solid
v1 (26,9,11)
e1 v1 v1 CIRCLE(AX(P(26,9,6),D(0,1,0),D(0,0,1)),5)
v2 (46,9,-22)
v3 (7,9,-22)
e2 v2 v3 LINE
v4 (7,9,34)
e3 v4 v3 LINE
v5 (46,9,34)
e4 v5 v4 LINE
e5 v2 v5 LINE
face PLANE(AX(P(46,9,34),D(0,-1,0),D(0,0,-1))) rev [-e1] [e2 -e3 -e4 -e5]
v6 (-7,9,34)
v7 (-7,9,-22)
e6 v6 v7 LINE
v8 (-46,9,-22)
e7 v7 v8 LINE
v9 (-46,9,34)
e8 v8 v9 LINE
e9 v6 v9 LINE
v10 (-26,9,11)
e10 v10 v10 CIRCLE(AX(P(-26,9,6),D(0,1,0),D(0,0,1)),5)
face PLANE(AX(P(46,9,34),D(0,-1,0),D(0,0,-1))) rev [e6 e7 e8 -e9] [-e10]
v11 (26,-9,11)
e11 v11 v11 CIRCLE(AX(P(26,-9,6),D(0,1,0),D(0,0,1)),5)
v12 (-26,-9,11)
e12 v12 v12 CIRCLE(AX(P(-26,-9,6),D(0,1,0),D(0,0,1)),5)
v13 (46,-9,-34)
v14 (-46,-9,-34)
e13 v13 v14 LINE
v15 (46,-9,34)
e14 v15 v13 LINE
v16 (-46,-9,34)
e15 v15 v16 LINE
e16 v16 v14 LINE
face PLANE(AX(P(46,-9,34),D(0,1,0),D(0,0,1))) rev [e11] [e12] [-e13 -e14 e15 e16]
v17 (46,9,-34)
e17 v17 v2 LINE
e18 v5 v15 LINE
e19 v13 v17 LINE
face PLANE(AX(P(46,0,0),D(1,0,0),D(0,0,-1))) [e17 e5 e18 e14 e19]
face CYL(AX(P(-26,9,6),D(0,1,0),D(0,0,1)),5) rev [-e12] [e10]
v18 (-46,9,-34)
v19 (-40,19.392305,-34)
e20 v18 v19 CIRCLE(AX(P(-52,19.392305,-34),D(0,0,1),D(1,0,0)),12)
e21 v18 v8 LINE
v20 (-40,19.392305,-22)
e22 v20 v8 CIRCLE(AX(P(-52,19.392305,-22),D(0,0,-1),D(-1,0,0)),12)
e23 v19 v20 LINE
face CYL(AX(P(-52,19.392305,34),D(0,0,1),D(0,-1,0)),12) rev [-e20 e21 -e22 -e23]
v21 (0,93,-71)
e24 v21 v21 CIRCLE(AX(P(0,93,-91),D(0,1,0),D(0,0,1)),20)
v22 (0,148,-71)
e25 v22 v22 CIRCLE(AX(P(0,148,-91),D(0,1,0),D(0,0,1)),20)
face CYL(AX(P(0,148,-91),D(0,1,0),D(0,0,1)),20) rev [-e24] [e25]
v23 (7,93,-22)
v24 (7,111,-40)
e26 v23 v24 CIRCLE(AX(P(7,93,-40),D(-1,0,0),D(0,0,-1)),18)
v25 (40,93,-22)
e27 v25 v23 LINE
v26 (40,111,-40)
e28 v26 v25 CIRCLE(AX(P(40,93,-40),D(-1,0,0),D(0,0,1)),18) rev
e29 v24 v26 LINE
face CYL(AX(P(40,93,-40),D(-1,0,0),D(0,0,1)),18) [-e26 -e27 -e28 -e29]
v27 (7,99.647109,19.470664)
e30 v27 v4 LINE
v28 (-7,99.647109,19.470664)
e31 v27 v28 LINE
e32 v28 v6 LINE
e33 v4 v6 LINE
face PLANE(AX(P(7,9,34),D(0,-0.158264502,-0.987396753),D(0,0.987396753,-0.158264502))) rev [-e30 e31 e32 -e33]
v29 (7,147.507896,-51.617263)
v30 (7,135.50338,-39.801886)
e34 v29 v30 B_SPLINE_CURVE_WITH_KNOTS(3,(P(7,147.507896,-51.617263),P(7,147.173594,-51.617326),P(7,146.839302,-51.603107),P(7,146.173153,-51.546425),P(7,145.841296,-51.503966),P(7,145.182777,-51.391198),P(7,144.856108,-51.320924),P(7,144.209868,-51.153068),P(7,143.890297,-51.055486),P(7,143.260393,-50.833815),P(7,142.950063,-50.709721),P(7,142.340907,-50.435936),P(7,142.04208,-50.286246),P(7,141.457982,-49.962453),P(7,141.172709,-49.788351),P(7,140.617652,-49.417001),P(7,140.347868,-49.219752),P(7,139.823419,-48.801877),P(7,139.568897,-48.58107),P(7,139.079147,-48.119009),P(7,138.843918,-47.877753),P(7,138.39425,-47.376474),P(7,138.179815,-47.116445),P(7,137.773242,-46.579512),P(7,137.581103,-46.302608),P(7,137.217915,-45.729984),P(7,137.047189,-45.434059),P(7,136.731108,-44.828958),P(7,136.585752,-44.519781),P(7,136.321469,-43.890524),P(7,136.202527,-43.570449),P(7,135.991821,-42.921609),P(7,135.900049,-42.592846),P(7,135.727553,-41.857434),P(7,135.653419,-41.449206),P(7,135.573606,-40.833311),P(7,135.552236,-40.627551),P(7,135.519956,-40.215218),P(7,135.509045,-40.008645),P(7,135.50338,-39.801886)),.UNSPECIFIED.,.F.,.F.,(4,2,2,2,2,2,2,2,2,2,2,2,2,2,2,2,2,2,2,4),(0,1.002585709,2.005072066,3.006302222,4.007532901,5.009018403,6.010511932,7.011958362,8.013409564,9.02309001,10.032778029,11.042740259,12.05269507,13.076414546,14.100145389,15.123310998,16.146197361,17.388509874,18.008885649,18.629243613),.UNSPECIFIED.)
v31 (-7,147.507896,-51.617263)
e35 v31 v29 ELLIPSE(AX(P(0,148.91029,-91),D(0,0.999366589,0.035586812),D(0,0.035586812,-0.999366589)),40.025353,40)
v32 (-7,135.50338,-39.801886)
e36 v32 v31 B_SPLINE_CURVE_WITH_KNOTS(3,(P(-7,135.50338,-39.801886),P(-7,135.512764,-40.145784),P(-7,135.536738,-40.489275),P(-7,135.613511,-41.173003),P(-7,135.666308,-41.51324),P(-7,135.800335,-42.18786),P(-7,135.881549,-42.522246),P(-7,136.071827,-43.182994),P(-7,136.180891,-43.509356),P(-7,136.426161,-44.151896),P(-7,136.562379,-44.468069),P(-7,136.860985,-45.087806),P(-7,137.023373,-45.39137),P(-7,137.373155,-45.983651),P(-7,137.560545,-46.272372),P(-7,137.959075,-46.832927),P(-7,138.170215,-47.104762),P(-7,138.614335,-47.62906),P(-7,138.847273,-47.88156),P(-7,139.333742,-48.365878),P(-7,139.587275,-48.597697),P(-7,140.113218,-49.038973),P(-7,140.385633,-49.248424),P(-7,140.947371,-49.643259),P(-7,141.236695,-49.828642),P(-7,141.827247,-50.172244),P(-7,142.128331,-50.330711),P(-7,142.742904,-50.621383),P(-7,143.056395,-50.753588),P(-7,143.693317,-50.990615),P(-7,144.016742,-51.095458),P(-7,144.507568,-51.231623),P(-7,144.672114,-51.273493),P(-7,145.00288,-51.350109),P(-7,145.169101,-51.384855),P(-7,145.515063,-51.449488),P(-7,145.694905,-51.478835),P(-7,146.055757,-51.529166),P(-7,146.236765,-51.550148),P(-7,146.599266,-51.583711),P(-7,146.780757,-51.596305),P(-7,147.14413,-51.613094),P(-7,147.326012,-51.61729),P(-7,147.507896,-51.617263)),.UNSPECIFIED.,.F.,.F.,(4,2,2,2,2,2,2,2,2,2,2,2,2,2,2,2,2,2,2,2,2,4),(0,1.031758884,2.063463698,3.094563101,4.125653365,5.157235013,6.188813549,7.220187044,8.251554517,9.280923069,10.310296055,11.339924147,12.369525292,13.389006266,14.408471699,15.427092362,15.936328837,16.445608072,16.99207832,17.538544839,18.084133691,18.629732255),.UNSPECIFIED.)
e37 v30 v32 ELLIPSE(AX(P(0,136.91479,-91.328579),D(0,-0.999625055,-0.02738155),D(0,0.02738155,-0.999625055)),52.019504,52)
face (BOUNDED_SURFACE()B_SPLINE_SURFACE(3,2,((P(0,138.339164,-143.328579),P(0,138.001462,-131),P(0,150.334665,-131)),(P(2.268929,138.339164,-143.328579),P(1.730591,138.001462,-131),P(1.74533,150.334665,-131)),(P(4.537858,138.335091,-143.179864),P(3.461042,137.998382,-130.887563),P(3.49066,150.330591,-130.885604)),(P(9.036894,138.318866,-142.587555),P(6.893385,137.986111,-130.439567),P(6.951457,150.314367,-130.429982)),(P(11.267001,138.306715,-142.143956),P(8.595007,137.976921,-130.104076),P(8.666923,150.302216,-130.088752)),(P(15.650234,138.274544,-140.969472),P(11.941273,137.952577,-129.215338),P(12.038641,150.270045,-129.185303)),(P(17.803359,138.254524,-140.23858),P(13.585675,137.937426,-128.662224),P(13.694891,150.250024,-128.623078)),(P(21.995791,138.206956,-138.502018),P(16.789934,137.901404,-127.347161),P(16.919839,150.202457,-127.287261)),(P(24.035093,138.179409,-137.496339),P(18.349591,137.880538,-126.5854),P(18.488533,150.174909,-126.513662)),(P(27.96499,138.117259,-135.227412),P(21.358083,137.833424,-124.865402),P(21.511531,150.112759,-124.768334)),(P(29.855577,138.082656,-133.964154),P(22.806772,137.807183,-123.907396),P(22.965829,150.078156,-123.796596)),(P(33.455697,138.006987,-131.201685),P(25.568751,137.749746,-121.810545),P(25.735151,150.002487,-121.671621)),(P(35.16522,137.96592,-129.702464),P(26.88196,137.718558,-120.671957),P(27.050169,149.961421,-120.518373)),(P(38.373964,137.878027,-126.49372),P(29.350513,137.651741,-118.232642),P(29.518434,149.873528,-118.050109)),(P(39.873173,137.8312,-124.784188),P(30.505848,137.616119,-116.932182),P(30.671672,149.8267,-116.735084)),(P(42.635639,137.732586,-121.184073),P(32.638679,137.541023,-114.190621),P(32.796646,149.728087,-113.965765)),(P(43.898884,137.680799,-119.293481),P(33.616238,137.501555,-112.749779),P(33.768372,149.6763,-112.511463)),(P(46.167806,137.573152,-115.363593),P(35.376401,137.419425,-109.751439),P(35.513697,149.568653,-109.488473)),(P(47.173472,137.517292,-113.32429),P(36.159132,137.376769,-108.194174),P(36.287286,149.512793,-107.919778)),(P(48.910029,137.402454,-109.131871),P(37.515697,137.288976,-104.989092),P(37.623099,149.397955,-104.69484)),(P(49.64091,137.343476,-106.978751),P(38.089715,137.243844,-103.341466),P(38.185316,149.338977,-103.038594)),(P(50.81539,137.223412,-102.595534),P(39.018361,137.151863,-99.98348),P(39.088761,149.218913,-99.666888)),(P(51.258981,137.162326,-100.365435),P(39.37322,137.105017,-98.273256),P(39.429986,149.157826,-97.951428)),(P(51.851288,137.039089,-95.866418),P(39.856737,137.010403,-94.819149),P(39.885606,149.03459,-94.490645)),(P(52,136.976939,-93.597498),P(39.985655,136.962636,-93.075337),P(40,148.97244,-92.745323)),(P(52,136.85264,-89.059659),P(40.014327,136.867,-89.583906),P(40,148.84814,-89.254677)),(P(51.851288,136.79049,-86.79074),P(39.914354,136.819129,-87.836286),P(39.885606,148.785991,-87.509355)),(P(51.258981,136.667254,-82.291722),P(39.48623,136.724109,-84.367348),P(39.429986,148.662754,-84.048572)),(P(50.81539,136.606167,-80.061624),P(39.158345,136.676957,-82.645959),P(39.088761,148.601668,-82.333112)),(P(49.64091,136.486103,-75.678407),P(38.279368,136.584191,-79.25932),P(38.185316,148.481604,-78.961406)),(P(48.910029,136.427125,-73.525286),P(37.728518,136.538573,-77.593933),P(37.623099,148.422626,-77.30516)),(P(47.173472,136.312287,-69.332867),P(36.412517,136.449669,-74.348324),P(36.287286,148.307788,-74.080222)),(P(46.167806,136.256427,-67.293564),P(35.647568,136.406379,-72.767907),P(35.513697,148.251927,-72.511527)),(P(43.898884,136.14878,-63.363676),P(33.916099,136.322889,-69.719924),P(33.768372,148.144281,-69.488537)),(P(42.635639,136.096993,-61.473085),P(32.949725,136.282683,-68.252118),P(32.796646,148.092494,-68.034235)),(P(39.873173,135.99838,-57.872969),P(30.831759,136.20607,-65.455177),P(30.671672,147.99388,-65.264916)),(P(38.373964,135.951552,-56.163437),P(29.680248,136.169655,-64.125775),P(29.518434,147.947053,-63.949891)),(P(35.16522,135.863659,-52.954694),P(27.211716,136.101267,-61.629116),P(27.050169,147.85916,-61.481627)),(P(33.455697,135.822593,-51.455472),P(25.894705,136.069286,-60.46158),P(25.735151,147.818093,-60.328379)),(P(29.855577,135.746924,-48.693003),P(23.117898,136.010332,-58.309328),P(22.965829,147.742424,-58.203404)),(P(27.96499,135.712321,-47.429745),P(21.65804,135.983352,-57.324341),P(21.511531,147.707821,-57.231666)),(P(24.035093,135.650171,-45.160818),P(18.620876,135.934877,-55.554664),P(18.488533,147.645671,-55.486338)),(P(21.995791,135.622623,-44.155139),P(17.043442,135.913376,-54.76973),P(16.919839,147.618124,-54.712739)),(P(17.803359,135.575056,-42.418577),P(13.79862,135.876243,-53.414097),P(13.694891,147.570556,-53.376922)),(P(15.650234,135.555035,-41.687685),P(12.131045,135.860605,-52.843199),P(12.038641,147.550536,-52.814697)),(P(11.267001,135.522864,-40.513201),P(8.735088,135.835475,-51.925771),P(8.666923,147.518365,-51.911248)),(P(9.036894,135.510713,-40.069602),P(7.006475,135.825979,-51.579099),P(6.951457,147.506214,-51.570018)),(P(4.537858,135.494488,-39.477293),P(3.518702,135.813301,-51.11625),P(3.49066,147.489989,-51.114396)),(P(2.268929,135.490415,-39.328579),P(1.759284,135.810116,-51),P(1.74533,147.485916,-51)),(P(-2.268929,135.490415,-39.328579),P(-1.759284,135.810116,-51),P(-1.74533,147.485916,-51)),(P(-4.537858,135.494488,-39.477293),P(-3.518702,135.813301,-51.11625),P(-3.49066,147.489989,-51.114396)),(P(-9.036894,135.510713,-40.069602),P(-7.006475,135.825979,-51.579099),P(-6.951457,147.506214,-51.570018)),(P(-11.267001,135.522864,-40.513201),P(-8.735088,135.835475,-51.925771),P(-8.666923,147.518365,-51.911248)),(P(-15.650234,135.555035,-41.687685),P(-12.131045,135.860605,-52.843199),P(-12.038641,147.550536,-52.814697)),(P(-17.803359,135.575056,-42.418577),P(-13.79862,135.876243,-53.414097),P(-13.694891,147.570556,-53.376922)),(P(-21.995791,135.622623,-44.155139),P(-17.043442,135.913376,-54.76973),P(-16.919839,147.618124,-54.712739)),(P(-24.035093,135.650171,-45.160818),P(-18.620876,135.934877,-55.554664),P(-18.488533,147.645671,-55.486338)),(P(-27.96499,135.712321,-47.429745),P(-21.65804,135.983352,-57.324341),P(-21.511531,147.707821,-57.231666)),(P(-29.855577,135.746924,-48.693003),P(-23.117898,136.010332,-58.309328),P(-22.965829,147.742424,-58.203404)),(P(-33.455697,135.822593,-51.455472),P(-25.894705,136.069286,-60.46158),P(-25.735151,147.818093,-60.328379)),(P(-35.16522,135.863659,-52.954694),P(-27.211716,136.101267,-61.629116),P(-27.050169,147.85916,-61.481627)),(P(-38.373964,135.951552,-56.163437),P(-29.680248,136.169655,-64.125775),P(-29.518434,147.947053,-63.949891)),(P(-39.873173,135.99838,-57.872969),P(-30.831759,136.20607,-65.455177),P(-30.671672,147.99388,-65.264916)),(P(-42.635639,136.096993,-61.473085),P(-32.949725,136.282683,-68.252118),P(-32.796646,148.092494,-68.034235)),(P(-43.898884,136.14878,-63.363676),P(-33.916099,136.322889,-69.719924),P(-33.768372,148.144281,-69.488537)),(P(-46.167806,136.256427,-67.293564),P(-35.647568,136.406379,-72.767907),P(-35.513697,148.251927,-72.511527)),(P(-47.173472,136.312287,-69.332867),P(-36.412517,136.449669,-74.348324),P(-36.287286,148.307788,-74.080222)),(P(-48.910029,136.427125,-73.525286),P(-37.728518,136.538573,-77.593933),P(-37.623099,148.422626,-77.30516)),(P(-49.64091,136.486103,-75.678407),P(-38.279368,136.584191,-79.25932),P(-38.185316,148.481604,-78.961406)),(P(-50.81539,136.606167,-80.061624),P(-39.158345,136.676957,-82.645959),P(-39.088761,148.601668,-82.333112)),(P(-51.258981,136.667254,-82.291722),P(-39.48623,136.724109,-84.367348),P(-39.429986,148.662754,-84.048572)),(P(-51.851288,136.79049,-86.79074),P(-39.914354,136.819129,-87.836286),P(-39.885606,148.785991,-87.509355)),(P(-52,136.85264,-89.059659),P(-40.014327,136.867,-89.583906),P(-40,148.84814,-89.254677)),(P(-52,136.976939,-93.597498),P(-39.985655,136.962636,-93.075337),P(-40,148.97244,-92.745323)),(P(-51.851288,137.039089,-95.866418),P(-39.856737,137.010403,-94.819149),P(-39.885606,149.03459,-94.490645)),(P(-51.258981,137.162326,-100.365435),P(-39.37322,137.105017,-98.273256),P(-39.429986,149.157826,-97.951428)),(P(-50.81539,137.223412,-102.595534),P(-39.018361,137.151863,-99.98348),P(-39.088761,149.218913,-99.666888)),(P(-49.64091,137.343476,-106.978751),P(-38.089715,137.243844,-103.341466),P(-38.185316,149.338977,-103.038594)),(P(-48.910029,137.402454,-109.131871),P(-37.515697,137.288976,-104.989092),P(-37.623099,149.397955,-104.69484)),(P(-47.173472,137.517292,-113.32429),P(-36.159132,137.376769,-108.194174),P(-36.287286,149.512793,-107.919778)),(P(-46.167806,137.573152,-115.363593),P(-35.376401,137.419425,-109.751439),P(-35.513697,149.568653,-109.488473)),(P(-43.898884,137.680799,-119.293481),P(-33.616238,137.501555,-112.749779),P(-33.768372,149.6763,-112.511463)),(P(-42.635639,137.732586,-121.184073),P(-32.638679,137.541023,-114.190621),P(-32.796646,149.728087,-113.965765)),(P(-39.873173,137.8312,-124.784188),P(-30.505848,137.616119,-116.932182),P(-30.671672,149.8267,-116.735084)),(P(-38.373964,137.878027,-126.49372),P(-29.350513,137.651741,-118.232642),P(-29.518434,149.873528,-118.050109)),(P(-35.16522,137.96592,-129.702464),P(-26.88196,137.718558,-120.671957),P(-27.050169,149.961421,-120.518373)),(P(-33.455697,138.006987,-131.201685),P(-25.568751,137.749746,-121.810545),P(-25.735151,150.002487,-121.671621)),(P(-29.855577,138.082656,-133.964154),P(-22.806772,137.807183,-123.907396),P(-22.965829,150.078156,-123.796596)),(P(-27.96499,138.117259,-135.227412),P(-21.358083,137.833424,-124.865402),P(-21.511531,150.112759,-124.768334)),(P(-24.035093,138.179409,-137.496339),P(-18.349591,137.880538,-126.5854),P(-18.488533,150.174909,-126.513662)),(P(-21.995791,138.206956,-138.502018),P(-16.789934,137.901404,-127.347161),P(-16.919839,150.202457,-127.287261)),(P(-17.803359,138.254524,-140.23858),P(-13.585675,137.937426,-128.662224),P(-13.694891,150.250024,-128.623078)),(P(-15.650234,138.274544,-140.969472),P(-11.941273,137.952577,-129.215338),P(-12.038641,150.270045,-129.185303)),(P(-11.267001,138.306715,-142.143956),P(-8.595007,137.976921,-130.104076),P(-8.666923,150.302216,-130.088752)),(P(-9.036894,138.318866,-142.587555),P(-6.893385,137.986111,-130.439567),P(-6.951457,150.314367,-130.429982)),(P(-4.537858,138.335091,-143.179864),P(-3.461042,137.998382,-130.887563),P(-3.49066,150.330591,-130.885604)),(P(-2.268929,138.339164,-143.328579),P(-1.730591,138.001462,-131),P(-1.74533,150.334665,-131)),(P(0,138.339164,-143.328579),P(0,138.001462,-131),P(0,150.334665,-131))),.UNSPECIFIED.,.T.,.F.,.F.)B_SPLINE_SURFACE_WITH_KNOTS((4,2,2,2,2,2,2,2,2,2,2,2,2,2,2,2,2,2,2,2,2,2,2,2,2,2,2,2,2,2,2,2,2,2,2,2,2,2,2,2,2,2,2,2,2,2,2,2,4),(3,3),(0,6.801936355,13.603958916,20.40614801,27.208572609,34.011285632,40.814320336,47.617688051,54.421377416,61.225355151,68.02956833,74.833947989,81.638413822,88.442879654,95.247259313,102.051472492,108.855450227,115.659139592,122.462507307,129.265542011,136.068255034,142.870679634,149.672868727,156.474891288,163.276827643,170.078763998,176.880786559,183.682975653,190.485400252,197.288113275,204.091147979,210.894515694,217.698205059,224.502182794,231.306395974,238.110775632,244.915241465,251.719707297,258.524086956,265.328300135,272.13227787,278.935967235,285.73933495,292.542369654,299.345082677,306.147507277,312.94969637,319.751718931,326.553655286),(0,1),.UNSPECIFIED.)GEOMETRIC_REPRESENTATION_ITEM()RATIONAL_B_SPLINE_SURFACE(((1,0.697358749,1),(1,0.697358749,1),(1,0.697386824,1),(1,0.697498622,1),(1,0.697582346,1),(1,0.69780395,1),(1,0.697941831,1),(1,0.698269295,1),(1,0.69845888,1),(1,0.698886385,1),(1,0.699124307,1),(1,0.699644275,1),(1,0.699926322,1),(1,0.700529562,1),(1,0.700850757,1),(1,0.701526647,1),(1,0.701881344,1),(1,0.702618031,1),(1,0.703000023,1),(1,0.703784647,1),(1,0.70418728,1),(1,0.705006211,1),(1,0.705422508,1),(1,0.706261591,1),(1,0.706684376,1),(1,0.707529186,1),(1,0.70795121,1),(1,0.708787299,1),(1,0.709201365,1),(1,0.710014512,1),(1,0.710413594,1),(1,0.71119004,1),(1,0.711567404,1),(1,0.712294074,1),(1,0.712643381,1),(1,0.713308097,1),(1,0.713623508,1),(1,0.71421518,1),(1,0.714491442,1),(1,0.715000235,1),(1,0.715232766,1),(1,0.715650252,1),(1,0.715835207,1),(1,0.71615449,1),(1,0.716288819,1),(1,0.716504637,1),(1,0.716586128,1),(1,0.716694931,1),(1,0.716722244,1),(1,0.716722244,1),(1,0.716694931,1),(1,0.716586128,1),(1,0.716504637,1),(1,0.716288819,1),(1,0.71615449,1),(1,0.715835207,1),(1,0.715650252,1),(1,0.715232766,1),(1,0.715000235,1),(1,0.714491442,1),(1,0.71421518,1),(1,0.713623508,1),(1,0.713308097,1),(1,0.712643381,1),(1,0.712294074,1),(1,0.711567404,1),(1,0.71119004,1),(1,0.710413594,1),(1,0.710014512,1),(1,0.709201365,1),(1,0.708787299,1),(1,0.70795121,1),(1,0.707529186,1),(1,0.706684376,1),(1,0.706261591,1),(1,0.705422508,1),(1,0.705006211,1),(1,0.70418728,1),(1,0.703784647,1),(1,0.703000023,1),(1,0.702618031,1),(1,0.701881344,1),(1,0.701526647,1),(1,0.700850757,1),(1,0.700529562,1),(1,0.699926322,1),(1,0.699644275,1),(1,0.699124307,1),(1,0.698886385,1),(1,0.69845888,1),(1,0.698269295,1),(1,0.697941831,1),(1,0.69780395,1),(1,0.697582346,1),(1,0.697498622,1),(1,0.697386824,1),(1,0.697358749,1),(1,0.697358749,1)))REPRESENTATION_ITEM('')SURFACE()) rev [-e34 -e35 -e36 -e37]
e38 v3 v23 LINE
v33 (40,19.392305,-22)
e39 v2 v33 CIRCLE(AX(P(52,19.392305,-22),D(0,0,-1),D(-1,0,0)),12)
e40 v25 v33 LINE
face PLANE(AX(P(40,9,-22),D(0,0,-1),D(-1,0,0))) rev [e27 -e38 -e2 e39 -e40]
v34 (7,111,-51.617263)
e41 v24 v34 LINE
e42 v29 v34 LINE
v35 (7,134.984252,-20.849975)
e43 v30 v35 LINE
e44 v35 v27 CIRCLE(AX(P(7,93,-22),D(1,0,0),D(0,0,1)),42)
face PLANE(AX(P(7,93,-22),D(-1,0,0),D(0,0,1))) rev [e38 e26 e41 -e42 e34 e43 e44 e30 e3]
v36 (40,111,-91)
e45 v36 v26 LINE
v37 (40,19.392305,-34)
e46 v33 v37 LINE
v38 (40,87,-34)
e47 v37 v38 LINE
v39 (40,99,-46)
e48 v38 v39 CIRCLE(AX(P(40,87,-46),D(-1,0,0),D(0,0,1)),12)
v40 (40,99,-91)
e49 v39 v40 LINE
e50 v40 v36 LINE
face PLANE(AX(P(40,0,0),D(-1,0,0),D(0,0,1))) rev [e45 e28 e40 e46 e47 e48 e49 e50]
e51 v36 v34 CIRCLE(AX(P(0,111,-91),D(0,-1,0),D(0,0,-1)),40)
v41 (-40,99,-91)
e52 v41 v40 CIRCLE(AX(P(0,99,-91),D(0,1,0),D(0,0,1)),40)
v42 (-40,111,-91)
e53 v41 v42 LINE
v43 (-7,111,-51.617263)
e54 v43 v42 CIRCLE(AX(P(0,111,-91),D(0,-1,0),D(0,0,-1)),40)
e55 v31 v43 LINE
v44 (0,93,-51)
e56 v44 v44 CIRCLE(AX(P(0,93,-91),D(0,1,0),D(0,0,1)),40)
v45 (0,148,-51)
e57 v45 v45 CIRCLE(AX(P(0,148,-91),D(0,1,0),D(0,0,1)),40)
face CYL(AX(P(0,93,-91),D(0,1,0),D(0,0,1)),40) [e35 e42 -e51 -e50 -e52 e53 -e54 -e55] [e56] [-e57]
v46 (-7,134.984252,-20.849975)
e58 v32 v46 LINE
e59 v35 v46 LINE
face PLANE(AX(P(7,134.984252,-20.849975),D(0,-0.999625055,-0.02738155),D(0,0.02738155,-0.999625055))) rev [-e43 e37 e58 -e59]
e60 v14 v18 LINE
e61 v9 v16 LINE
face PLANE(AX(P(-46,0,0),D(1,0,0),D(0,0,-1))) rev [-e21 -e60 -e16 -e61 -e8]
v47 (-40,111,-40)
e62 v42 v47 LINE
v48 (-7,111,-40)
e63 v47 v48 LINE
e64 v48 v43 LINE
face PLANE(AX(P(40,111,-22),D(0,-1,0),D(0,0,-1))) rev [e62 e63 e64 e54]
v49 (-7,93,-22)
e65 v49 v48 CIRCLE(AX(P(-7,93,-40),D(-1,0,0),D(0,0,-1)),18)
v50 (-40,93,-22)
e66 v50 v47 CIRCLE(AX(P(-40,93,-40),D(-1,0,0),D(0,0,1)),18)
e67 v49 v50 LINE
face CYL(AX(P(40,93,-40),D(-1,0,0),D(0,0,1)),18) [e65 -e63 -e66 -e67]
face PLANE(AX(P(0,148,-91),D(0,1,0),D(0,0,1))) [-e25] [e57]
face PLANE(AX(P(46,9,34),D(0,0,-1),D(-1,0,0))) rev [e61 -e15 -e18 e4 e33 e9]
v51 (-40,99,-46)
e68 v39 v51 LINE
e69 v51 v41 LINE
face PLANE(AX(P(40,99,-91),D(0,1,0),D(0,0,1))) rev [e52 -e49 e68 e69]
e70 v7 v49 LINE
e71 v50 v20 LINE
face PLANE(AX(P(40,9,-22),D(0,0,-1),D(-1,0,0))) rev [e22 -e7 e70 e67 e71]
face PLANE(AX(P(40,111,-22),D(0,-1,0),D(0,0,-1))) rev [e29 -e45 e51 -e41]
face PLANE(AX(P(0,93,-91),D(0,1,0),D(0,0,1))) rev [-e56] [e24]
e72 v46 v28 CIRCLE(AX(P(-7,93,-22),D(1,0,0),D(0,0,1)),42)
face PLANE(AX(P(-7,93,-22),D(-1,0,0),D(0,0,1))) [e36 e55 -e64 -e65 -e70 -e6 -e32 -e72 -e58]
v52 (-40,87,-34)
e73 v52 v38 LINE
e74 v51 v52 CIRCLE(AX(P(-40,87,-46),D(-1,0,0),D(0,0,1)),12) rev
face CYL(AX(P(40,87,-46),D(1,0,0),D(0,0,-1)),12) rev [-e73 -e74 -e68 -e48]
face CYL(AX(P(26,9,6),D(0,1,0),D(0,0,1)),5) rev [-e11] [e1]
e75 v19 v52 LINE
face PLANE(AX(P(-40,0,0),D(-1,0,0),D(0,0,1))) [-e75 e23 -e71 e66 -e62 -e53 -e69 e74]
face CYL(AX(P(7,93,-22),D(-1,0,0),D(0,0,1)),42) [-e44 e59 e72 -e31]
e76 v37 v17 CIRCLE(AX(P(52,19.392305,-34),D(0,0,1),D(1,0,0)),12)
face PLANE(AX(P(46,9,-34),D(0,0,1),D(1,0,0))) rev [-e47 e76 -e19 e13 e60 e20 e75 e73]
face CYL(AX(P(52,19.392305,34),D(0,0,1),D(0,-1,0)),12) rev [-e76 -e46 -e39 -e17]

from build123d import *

# Parameters (mm, degrees)
SKETCH1_W                = 68
SKETCH1_H                = 18
BOSS_EXTRUDE1_DEPTH      = 46
BOSS_EXTRUDE2_DEPTH      = 40
FILLET1_R                = 12
FILLET3_R                = 18
FILLET4_R                = 12
BOSS_EXTRUDE3_DEPTH      = 37
BOSS_EXTRUDE3_DEPTH_BACK = 18
SKETCH3_R                = 40
HOLE1_D                  = 40
BOSS_EXTRUDE5_DEPTH      = 7
FILLET5_R                = 12
HOLE2_D                  = 10


with BuildPart() as part:
    # Sketch1 → Boss-Extrude1 (new, symmetric)
    with BuildSketch(Plane(origin=(0, 0, 0), x_dir=(0, 0, -1), z_dir=(1, 0, 0))):
        Rectangle(SKETCH1_W, SKETCH1_H)
    extrude(amount=BOSS_EXTRUDE1_DEPTH, both=True)

    # Sketch2 → Boss-Extrude2 (add, symmetric)
    with BuildSketch(Plane(origin=(0, 0, 0), x_dir=(0, 0, -1), z_dir=(1, 0, 0))):
        Polygon((34, 9), (22, 9), (22, 111), (91, 111), (91, 99), (34, 99), align=None)
    extrude(amount=BOSS_EXTRUDE2_DEPTH, both=True)

    # Fillet1
    # the kernel refuses this fillet: 12 mm, written as the material it adds along each edge
    with BuildSketch(Plane(origin=(-40, 9, -34), x_dir=(-1, 0, 0), z_dir=(0, 0, 1))) as fillet1_piece_1:
        with BuildLine():
            CenterArc((12, -10.392304845), FILLET1_R, 120, 60)
            Line((0, -10.392304845), (-0.24, -10.392304845))
            Line((-0.24, -10.392304845), (-0.24, 0))
            Line((-0.24, 0), (0, 0.24))
            ThreePointArc((0, 0.24), (3, 0.24), (5.88, 0.207846097))
            Line((5.88, 0.207846097), (6, 0))
        make_face()
    extrude(amount=12)
    with BuildSketch(Plane(origin=(40, 9, -34), x_dir=(1, 0, 0), z_dir=(0, 0, 1))) as fillet1_piece_2:
        with BuildLine():
            CenterArc((12, 10.392304845), FILLET1_R, 180, 60)
            Line((0, 10.392304845), (-0.24, 10.392304845))
            Line((-0.24, 10.392304845), (-0.24, 0))
            Line((-0.24, 0), (0, -0.24))
            ThreePointArc((0, -0.24), (3, -0.24), (5.88, -0.207846097))
            Line((5.88, -0.207846097), (6, 0))
        make_face()
    extrude(amount=12)

    # Fillet3
    fillet3_edges = [part.edges().sort_by_distance(p)[0] for p in [
        (0, 111, -22),
    ]]
    fillet(fillet3_edges, radius=FILLET3_R)

    # Fillet4
    fillet4_edges = [part.edges().sort_by_distance(p)[0] for p in [
        (0, 99, -34),
    ]]
    fillet(fillet4_edges, radius=FILLET4_R)

    # Sketch3 → Boss-Extrude3 (add, two sides: drawn at the far end of the back side and taken through both)
    with BuildSketch(Plane(origin=(0, 111, 0), x_dir=(1, 0, 0), z_dir=(0, 1, 0)).offset(-BOSS_EXTRUDE3_DEPTH_BACK)):
        with Locations(Location((0, 91, 0), (0, 0, 270))):
            Circle(SKETCH3_R)
    extrude(amount=BOSS_EXTRUDE3_DEPTH + BOSS_EXTRUDE3_DEPTH_BACK)

    # Hole1 (through all)
    with Locations(Plane(origin=(0, 148, 0), x_dir=(1, 0, 0), z_dir=(0, 1, 0))):
        with Locations((0, 91)):
            Hole(HOLE1_D / 2)

    # Sketch6 → Boss-Extrude5 (add, symmetric)
    with BuildSketch(Plane(origin=(0, 0, 0), x_dir=(0, 0, -1), z_dir=(1, 0, 0))):
        with BuildLine():
            Line((-34, 9), (-19.470663618, 99.647109079))
            ThreePointArc((-19.470663618, 99.647109079), (-5.682290367, 124.586243842), (20.849974888, 134.984252313))
            Line((20.849974888, 134.984252313), (57.932127912, 136))
            Line((57.932127912, 136), (57.932127912, 111))
            Line((57.932127912, 111), (40, 111))
            ThreePointArc((40, 111), (27.272077939, 105.727922061), (22, 93))
            Line((22, 93), (22, 19.392304845))
            Line((22, 19.392304845), (22, 9))
            Line((22, 9), (-34, 9))
        make_face()
    extrude(amount=BOSS_EXTRUDE5_DEPTH, both=True)

    # Fillet5
    fillet5_edges = [part.edges().sort_by_distance(p)[0] for p in [
        (3.513591356, 135.814351592, -51.154615377),
    ]]
    fillet(fillet5_edges, radius=FILLET5_R)

    # Hole2 (through all)
    with Locations(Plane(origin=(0, 9, 0), x_dir=(1, 0, 0), z_dir=(0, 1, 0))):
        with Locations((26, -6)):
            hole2 = Hole(HOLE2_D / 2)

    # Mirror1: Hole2 across plane
    add(hole2.mirror(Plane(origin=(0, 0, 0), x_dir=(0, 0, 1), z_dir=(1, 0, 0))), mode=Mode.SUBTRACT)


solid = part.part
